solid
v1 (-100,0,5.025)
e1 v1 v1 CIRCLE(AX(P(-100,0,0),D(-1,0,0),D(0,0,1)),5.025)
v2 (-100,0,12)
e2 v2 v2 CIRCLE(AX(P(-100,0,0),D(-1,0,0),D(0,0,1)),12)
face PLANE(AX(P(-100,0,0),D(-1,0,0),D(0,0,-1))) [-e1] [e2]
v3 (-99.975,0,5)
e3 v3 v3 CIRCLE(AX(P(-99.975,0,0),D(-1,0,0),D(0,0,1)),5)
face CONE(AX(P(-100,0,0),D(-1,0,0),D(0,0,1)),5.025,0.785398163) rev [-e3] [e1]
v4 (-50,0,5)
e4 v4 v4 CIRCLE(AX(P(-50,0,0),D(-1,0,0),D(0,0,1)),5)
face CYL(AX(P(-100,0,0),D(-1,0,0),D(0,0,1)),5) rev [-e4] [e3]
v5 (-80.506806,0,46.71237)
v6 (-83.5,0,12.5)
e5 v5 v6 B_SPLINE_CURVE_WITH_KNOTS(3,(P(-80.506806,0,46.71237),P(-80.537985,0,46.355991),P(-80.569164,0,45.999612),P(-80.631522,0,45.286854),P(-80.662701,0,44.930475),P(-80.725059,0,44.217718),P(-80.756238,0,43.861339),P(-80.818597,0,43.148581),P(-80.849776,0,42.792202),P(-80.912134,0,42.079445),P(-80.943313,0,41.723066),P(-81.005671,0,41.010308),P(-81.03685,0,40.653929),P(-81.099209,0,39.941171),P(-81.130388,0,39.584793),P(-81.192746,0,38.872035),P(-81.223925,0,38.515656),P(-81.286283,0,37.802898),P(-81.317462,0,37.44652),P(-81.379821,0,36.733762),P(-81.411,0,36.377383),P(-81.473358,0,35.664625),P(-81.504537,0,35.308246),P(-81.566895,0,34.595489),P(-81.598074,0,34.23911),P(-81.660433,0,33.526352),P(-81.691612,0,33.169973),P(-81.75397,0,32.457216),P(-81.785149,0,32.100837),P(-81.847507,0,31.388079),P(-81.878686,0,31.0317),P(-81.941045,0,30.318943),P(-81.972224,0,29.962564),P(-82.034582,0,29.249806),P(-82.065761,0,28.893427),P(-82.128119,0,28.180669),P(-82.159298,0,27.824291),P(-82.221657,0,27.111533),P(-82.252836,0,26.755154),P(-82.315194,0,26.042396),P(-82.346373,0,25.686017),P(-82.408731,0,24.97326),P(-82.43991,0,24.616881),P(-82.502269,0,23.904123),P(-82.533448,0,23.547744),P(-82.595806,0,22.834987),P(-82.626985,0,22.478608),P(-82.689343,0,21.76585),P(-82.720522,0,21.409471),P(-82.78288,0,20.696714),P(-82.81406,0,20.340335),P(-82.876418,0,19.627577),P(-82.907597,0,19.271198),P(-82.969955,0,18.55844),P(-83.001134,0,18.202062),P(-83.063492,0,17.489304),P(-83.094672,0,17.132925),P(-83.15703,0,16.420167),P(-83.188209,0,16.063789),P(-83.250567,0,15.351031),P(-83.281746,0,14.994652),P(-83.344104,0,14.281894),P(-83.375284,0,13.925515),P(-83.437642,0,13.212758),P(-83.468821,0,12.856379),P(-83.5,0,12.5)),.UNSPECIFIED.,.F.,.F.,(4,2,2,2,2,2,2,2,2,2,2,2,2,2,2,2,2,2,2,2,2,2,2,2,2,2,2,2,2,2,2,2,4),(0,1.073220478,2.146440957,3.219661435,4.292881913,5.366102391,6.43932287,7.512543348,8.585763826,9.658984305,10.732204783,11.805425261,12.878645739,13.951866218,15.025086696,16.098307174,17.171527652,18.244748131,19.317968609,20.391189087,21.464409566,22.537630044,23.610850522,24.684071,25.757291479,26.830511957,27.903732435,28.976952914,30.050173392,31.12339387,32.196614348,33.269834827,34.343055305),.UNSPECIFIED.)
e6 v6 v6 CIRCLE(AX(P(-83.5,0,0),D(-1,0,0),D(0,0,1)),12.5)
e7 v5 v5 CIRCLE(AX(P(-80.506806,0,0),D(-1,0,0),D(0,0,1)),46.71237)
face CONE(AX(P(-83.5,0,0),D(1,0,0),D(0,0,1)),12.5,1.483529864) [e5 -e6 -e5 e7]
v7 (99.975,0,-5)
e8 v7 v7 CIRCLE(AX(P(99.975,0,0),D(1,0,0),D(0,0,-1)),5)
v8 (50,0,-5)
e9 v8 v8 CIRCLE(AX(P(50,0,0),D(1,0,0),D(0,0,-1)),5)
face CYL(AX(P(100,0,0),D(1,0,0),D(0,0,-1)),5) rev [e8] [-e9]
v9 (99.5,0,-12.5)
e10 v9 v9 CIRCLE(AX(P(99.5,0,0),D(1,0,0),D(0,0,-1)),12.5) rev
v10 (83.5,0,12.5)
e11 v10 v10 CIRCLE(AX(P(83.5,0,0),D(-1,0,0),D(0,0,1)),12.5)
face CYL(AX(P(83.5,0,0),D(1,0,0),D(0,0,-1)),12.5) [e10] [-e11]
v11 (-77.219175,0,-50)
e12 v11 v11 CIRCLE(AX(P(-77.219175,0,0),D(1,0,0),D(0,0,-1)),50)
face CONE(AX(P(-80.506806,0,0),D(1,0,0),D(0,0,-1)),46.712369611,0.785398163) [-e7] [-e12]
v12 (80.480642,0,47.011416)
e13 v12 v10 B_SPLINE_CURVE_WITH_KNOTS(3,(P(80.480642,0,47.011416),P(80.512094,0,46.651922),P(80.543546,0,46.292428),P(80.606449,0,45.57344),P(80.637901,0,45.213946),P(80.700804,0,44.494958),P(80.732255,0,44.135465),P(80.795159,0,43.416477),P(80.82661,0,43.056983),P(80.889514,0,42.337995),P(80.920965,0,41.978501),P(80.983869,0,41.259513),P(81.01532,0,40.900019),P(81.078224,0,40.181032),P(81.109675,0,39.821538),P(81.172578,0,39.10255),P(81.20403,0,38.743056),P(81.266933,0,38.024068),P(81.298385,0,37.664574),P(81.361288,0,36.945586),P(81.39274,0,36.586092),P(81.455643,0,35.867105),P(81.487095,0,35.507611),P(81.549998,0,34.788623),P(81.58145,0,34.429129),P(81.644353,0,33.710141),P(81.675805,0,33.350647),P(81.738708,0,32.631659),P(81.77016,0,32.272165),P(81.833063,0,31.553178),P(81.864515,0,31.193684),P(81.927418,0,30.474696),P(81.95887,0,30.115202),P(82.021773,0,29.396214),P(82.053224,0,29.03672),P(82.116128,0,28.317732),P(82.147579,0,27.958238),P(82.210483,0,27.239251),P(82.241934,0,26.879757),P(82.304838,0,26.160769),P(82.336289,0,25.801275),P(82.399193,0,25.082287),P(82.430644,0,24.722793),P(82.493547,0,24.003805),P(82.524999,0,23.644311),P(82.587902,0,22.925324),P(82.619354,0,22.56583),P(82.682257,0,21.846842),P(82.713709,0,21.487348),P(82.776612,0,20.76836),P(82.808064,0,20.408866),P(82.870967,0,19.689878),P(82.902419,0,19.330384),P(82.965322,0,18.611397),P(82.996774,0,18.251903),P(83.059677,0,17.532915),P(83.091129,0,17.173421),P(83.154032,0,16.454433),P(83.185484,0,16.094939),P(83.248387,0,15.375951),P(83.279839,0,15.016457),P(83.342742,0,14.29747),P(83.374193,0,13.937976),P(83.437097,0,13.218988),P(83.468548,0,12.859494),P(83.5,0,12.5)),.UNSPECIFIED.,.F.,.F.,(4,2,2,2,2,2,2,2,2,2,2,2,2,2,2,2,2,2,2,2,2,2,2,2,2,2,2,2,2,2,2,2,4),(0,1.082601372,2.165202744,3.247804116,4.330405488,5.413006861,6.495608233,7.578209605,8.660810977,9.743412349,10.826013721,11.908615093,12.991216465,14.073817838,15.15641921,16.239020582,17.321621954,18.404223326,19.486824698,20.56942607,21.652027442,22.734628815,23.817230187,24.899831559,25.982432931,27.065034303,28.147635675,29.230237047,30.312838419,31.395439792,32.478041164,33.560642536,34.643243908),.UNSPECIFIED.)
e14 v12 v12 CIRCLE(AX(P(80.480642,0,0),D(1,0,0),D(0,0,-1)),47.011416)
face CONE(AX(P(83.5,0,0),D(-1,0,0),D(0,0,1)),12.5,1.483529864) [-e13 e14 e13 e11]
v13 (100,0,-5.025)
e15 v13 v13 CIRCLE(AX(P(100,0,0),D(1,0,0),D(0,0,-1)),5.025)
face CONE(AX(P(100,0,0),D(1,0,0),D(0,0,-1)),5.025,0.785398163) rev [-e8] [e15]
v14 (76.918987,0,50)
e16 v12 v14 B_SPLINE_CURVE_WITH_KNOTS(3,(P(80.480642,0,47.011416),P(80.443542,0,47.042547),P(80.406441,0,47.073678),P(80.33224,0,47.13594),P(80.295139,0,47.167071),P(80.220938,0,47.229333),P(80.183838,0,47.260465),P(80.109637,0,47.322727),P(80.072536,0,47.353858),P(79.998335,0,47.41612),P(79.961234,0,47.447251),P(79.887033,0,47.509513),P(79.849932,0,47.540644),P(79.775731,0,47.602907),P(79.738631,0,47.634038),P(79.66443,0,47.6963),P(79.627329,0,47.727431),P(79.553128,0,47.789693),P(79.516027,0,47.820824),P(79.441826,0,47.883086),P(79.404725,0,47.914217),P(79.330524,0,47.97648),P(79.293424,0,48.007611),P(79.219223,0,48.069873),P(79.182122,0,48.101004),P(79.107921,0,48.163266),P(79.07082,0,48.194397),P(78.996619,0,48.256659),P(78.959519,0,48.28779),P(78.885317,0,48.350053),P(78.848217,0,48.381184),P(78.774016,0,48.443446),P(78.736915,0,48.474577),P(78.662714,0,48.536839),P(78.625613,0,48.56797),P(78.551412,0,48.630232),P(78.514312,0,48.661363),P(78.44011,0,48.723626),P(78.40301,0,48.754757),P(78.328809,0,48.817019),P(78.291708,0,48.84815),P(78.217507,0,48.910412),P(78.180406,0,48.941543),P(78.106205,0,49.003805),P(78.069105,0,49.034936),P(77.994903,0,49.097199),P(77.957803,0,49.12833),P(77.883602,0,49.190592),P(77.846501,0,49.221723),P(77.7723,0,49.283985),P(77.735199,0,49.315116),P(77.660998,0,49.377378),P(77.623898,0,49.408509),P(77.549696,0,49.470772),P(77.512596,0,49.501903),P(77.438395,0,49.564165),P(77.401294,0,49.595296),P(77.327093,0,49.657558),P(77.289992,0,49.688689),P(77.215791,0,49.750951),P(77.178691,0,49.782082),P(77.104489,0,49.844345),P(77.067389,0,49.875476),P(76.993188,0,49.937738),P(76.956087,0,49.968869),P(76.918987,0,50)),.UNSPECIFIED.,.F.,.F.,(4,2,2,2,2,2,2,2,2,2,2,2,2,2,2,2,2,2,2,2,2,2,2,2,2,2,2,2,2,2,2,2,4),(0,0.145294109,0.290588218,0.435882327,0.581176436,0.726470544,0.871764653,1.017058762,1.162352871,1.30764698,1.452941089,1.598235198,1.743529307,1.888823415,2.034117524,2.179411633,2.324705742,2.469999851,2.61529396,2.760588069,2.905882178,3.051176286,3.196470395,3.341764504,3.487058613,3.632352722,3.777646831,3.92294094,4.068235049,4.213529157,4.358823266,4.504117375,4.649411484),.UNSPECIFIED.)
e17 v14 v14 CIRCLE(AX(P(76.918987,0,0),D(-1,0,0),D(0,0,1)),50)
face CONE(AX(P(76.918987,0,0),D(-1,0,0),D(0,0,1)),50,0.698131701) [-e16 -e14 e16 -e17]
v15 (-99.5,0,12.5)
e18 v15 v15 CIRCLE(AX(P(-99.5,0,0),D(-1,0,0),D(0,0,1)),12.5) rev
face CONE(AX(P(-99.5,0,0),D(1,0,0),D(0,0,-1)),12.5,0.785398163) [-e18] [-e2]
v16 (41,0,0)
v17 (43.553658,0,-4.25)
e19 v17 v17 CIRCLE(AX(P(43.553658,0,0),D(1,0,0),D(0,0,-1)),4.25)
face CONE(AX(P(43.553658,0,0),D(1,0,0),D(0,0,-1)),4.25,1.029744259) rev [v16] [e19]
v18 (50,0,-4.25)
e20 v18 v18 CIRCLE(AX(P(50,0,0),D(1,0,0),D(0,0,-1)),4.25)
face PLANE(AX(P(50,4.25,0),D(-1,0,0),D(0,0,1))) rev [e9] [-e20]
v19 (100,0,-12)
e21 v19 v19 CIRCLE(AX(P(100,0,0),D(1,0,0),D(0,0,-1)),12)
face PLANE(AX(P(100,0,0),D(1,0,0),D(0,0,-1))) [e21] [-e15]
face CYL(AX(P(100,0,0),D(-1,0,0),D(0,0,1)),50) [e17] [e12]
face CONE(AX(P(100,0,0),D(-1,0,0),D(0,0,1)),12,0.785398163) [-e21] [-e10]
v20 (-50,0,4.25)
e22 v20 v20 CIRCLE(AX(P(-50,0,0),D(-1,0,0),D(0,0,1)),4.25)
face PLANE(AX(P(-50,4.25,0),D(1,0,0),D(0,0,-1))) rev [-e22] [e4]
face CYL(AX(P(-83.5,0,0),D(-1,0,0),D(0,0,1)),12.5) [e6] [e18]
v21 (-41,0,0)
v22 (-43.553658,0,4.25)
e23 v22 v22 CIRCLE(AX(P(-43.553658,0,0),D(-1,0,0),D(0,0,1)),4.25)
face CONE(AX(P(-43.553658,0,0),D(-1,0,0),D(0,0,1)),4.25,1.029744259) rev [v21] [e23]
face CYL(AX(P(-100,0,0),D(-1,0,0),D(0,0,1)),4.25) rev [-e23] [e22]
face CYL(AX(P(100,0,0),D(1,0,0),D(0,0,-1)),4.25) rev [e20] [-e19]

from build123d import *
from build123d.topology import SkipClean

# Parameters (mm, degrees)
SKETCH2_R           = 50
BOSS_EXTRUDE1_DEPTH = 100
CUT_EXTRUDE1_START  = -16.5
SKETCH3_R           = 50
SKETCH3_R_2         = 12.5
CUT_EXTRUDE1_DEPTH  = 16.5
CHAMFER2_SIZE       = 0.5
CHAMFER3_SIZE       = 3
CHAMFER3_SIZE_2     = 3.300188603


# Read off the part's stored shape, not the designer's step: Mirror1
with BuildPart() as part:
    # Sketch2 → Boss-Extrude1 (new body)
    with BuildSketch(Plane.YZ):
        with Locations(Location((0, 0, 0), (0, 0, 270))):
            Circle(SKETCH2_R)
    extrude(amount=BOSS_EXTRUDE1_DEPTH)

    # Sketch3 → Cut-Extrude1 (cut)
    with BuildSketch(Plane.YZ.offset(100).offset(CUT_EXTRUDE1_START)):
        with Locations(Location((0, 0, 0), (0, 0, 270))):
            Circle(SKETCH3_R)
        with Locations(Location((0, 0, 0), (0, 0, 270))):
            Circle(SKETCH3_R_2, mode=Mode.SUBTRACT)
    extrude(amount=CUT_EXTRUDE1_DEPTH, mode=Mode.SUBTRACT)

    # Chamfer2
    chamfer2_edges = [part.edges().sort_by_distance(p)[0] for p in [
        (100, 0, 12.5),
    ]]
    chamfer(chamfer2_edges, length=CHAMFER2_SIZE)

    # Sketch4 → Cut-Revolve2 (revolve, cut)
    with BuildSketch(Plane(origin=(0, 0, 0), x_dir=(-1, 0, 0), z_dir=(0, 1, 0))):
        Polygon((-83.5, 12.5), (-80.219175118, 50), (-83.5, 50), align=None)
    revolve(axis=Axis((0, 0, 0), (1, 0, 0)), mode=Mode.SUBTRACT)

    # Chamfer3
    # the kernel refuses this chamfer: 3.300188603, 3 mm, written as the material it takes off along each edge
    with BuildSketch(Plane(origin=(80.219175118, 0, 0), x_dir=(0, 0, 1), z_dir=(0, 1, 0))) as chamfer3_piece_1:
        Polygon((50 - CHAMFER3_SIZE * 0.996194698092, CHAMFER3_SIZE * 0.0871557427477), (50, -CHAMFER3_SIZE_2), (50, 0), align=None)
    revolve(axis=Axis((80.219175118, 0, 0), (1, 0, 0)), revolution_arc=180, mode=Mode.SUBTRACT)
    with BuildSketch(Plane(origin=(80.219175118, 0, 0), x_dir=(0, 0, -1), z_dir=(0, -1, 0))) as chamfer3_piece_2:
        Polygon((50 - CHAMFER3_SIZE * 0.996194698092, CHAMFER3_SIZE * 0.0871557427477), (50, -CHAMFER3_SIZE_2), (50, 0), align=None)
    revolve(axis=Axis((80.219175118, 0, 0), (1, 0, 0)), revolution_arc=180, mode=Mode.SUBTRACT)

    # Sketch7 → M10 Tapped Hole1 (revolve, cut)
    with BuildSketch(Plane(origin=(100, 0, 0), x_dir=(0, 0, -1), z_dir=(0, 1, 0))):
        Polygon((0, 0), (0, 59), (4.25, 56.446342369), (4.25, 50), (5, 50), (5, 0.025), (5.025, 0), align=None)
    revolve(axis=Axis((106.35, 0, 0), (-1, 0, 0)), mode=Mode.SUBTRACT)

    # Mirror1 outline → Mirror1 (revolve)
    with SkipClean():  # the faces are left unmerged after this step: merging them gives an invalid solid
        with BuildSketch(Plane.YX):
            Polygon((50, 0), (0, 0), (0, -41), (4.25, -43.553657631), (4.25, -50), (5, -50), (5, -99.975), (5.025, -100), (12, -100), (12.5, -99.5), (12.5, -83.5), (46.712369611, -80.506805507), (50, -77.219175118), align=None)
        revolve(axis=Axis((0, 0, 0), (1, 0, 0)))
    add(part.part.scale(1), mode=Mode.REPLACE)  # the faces are merged on a copy


solid = part.part
